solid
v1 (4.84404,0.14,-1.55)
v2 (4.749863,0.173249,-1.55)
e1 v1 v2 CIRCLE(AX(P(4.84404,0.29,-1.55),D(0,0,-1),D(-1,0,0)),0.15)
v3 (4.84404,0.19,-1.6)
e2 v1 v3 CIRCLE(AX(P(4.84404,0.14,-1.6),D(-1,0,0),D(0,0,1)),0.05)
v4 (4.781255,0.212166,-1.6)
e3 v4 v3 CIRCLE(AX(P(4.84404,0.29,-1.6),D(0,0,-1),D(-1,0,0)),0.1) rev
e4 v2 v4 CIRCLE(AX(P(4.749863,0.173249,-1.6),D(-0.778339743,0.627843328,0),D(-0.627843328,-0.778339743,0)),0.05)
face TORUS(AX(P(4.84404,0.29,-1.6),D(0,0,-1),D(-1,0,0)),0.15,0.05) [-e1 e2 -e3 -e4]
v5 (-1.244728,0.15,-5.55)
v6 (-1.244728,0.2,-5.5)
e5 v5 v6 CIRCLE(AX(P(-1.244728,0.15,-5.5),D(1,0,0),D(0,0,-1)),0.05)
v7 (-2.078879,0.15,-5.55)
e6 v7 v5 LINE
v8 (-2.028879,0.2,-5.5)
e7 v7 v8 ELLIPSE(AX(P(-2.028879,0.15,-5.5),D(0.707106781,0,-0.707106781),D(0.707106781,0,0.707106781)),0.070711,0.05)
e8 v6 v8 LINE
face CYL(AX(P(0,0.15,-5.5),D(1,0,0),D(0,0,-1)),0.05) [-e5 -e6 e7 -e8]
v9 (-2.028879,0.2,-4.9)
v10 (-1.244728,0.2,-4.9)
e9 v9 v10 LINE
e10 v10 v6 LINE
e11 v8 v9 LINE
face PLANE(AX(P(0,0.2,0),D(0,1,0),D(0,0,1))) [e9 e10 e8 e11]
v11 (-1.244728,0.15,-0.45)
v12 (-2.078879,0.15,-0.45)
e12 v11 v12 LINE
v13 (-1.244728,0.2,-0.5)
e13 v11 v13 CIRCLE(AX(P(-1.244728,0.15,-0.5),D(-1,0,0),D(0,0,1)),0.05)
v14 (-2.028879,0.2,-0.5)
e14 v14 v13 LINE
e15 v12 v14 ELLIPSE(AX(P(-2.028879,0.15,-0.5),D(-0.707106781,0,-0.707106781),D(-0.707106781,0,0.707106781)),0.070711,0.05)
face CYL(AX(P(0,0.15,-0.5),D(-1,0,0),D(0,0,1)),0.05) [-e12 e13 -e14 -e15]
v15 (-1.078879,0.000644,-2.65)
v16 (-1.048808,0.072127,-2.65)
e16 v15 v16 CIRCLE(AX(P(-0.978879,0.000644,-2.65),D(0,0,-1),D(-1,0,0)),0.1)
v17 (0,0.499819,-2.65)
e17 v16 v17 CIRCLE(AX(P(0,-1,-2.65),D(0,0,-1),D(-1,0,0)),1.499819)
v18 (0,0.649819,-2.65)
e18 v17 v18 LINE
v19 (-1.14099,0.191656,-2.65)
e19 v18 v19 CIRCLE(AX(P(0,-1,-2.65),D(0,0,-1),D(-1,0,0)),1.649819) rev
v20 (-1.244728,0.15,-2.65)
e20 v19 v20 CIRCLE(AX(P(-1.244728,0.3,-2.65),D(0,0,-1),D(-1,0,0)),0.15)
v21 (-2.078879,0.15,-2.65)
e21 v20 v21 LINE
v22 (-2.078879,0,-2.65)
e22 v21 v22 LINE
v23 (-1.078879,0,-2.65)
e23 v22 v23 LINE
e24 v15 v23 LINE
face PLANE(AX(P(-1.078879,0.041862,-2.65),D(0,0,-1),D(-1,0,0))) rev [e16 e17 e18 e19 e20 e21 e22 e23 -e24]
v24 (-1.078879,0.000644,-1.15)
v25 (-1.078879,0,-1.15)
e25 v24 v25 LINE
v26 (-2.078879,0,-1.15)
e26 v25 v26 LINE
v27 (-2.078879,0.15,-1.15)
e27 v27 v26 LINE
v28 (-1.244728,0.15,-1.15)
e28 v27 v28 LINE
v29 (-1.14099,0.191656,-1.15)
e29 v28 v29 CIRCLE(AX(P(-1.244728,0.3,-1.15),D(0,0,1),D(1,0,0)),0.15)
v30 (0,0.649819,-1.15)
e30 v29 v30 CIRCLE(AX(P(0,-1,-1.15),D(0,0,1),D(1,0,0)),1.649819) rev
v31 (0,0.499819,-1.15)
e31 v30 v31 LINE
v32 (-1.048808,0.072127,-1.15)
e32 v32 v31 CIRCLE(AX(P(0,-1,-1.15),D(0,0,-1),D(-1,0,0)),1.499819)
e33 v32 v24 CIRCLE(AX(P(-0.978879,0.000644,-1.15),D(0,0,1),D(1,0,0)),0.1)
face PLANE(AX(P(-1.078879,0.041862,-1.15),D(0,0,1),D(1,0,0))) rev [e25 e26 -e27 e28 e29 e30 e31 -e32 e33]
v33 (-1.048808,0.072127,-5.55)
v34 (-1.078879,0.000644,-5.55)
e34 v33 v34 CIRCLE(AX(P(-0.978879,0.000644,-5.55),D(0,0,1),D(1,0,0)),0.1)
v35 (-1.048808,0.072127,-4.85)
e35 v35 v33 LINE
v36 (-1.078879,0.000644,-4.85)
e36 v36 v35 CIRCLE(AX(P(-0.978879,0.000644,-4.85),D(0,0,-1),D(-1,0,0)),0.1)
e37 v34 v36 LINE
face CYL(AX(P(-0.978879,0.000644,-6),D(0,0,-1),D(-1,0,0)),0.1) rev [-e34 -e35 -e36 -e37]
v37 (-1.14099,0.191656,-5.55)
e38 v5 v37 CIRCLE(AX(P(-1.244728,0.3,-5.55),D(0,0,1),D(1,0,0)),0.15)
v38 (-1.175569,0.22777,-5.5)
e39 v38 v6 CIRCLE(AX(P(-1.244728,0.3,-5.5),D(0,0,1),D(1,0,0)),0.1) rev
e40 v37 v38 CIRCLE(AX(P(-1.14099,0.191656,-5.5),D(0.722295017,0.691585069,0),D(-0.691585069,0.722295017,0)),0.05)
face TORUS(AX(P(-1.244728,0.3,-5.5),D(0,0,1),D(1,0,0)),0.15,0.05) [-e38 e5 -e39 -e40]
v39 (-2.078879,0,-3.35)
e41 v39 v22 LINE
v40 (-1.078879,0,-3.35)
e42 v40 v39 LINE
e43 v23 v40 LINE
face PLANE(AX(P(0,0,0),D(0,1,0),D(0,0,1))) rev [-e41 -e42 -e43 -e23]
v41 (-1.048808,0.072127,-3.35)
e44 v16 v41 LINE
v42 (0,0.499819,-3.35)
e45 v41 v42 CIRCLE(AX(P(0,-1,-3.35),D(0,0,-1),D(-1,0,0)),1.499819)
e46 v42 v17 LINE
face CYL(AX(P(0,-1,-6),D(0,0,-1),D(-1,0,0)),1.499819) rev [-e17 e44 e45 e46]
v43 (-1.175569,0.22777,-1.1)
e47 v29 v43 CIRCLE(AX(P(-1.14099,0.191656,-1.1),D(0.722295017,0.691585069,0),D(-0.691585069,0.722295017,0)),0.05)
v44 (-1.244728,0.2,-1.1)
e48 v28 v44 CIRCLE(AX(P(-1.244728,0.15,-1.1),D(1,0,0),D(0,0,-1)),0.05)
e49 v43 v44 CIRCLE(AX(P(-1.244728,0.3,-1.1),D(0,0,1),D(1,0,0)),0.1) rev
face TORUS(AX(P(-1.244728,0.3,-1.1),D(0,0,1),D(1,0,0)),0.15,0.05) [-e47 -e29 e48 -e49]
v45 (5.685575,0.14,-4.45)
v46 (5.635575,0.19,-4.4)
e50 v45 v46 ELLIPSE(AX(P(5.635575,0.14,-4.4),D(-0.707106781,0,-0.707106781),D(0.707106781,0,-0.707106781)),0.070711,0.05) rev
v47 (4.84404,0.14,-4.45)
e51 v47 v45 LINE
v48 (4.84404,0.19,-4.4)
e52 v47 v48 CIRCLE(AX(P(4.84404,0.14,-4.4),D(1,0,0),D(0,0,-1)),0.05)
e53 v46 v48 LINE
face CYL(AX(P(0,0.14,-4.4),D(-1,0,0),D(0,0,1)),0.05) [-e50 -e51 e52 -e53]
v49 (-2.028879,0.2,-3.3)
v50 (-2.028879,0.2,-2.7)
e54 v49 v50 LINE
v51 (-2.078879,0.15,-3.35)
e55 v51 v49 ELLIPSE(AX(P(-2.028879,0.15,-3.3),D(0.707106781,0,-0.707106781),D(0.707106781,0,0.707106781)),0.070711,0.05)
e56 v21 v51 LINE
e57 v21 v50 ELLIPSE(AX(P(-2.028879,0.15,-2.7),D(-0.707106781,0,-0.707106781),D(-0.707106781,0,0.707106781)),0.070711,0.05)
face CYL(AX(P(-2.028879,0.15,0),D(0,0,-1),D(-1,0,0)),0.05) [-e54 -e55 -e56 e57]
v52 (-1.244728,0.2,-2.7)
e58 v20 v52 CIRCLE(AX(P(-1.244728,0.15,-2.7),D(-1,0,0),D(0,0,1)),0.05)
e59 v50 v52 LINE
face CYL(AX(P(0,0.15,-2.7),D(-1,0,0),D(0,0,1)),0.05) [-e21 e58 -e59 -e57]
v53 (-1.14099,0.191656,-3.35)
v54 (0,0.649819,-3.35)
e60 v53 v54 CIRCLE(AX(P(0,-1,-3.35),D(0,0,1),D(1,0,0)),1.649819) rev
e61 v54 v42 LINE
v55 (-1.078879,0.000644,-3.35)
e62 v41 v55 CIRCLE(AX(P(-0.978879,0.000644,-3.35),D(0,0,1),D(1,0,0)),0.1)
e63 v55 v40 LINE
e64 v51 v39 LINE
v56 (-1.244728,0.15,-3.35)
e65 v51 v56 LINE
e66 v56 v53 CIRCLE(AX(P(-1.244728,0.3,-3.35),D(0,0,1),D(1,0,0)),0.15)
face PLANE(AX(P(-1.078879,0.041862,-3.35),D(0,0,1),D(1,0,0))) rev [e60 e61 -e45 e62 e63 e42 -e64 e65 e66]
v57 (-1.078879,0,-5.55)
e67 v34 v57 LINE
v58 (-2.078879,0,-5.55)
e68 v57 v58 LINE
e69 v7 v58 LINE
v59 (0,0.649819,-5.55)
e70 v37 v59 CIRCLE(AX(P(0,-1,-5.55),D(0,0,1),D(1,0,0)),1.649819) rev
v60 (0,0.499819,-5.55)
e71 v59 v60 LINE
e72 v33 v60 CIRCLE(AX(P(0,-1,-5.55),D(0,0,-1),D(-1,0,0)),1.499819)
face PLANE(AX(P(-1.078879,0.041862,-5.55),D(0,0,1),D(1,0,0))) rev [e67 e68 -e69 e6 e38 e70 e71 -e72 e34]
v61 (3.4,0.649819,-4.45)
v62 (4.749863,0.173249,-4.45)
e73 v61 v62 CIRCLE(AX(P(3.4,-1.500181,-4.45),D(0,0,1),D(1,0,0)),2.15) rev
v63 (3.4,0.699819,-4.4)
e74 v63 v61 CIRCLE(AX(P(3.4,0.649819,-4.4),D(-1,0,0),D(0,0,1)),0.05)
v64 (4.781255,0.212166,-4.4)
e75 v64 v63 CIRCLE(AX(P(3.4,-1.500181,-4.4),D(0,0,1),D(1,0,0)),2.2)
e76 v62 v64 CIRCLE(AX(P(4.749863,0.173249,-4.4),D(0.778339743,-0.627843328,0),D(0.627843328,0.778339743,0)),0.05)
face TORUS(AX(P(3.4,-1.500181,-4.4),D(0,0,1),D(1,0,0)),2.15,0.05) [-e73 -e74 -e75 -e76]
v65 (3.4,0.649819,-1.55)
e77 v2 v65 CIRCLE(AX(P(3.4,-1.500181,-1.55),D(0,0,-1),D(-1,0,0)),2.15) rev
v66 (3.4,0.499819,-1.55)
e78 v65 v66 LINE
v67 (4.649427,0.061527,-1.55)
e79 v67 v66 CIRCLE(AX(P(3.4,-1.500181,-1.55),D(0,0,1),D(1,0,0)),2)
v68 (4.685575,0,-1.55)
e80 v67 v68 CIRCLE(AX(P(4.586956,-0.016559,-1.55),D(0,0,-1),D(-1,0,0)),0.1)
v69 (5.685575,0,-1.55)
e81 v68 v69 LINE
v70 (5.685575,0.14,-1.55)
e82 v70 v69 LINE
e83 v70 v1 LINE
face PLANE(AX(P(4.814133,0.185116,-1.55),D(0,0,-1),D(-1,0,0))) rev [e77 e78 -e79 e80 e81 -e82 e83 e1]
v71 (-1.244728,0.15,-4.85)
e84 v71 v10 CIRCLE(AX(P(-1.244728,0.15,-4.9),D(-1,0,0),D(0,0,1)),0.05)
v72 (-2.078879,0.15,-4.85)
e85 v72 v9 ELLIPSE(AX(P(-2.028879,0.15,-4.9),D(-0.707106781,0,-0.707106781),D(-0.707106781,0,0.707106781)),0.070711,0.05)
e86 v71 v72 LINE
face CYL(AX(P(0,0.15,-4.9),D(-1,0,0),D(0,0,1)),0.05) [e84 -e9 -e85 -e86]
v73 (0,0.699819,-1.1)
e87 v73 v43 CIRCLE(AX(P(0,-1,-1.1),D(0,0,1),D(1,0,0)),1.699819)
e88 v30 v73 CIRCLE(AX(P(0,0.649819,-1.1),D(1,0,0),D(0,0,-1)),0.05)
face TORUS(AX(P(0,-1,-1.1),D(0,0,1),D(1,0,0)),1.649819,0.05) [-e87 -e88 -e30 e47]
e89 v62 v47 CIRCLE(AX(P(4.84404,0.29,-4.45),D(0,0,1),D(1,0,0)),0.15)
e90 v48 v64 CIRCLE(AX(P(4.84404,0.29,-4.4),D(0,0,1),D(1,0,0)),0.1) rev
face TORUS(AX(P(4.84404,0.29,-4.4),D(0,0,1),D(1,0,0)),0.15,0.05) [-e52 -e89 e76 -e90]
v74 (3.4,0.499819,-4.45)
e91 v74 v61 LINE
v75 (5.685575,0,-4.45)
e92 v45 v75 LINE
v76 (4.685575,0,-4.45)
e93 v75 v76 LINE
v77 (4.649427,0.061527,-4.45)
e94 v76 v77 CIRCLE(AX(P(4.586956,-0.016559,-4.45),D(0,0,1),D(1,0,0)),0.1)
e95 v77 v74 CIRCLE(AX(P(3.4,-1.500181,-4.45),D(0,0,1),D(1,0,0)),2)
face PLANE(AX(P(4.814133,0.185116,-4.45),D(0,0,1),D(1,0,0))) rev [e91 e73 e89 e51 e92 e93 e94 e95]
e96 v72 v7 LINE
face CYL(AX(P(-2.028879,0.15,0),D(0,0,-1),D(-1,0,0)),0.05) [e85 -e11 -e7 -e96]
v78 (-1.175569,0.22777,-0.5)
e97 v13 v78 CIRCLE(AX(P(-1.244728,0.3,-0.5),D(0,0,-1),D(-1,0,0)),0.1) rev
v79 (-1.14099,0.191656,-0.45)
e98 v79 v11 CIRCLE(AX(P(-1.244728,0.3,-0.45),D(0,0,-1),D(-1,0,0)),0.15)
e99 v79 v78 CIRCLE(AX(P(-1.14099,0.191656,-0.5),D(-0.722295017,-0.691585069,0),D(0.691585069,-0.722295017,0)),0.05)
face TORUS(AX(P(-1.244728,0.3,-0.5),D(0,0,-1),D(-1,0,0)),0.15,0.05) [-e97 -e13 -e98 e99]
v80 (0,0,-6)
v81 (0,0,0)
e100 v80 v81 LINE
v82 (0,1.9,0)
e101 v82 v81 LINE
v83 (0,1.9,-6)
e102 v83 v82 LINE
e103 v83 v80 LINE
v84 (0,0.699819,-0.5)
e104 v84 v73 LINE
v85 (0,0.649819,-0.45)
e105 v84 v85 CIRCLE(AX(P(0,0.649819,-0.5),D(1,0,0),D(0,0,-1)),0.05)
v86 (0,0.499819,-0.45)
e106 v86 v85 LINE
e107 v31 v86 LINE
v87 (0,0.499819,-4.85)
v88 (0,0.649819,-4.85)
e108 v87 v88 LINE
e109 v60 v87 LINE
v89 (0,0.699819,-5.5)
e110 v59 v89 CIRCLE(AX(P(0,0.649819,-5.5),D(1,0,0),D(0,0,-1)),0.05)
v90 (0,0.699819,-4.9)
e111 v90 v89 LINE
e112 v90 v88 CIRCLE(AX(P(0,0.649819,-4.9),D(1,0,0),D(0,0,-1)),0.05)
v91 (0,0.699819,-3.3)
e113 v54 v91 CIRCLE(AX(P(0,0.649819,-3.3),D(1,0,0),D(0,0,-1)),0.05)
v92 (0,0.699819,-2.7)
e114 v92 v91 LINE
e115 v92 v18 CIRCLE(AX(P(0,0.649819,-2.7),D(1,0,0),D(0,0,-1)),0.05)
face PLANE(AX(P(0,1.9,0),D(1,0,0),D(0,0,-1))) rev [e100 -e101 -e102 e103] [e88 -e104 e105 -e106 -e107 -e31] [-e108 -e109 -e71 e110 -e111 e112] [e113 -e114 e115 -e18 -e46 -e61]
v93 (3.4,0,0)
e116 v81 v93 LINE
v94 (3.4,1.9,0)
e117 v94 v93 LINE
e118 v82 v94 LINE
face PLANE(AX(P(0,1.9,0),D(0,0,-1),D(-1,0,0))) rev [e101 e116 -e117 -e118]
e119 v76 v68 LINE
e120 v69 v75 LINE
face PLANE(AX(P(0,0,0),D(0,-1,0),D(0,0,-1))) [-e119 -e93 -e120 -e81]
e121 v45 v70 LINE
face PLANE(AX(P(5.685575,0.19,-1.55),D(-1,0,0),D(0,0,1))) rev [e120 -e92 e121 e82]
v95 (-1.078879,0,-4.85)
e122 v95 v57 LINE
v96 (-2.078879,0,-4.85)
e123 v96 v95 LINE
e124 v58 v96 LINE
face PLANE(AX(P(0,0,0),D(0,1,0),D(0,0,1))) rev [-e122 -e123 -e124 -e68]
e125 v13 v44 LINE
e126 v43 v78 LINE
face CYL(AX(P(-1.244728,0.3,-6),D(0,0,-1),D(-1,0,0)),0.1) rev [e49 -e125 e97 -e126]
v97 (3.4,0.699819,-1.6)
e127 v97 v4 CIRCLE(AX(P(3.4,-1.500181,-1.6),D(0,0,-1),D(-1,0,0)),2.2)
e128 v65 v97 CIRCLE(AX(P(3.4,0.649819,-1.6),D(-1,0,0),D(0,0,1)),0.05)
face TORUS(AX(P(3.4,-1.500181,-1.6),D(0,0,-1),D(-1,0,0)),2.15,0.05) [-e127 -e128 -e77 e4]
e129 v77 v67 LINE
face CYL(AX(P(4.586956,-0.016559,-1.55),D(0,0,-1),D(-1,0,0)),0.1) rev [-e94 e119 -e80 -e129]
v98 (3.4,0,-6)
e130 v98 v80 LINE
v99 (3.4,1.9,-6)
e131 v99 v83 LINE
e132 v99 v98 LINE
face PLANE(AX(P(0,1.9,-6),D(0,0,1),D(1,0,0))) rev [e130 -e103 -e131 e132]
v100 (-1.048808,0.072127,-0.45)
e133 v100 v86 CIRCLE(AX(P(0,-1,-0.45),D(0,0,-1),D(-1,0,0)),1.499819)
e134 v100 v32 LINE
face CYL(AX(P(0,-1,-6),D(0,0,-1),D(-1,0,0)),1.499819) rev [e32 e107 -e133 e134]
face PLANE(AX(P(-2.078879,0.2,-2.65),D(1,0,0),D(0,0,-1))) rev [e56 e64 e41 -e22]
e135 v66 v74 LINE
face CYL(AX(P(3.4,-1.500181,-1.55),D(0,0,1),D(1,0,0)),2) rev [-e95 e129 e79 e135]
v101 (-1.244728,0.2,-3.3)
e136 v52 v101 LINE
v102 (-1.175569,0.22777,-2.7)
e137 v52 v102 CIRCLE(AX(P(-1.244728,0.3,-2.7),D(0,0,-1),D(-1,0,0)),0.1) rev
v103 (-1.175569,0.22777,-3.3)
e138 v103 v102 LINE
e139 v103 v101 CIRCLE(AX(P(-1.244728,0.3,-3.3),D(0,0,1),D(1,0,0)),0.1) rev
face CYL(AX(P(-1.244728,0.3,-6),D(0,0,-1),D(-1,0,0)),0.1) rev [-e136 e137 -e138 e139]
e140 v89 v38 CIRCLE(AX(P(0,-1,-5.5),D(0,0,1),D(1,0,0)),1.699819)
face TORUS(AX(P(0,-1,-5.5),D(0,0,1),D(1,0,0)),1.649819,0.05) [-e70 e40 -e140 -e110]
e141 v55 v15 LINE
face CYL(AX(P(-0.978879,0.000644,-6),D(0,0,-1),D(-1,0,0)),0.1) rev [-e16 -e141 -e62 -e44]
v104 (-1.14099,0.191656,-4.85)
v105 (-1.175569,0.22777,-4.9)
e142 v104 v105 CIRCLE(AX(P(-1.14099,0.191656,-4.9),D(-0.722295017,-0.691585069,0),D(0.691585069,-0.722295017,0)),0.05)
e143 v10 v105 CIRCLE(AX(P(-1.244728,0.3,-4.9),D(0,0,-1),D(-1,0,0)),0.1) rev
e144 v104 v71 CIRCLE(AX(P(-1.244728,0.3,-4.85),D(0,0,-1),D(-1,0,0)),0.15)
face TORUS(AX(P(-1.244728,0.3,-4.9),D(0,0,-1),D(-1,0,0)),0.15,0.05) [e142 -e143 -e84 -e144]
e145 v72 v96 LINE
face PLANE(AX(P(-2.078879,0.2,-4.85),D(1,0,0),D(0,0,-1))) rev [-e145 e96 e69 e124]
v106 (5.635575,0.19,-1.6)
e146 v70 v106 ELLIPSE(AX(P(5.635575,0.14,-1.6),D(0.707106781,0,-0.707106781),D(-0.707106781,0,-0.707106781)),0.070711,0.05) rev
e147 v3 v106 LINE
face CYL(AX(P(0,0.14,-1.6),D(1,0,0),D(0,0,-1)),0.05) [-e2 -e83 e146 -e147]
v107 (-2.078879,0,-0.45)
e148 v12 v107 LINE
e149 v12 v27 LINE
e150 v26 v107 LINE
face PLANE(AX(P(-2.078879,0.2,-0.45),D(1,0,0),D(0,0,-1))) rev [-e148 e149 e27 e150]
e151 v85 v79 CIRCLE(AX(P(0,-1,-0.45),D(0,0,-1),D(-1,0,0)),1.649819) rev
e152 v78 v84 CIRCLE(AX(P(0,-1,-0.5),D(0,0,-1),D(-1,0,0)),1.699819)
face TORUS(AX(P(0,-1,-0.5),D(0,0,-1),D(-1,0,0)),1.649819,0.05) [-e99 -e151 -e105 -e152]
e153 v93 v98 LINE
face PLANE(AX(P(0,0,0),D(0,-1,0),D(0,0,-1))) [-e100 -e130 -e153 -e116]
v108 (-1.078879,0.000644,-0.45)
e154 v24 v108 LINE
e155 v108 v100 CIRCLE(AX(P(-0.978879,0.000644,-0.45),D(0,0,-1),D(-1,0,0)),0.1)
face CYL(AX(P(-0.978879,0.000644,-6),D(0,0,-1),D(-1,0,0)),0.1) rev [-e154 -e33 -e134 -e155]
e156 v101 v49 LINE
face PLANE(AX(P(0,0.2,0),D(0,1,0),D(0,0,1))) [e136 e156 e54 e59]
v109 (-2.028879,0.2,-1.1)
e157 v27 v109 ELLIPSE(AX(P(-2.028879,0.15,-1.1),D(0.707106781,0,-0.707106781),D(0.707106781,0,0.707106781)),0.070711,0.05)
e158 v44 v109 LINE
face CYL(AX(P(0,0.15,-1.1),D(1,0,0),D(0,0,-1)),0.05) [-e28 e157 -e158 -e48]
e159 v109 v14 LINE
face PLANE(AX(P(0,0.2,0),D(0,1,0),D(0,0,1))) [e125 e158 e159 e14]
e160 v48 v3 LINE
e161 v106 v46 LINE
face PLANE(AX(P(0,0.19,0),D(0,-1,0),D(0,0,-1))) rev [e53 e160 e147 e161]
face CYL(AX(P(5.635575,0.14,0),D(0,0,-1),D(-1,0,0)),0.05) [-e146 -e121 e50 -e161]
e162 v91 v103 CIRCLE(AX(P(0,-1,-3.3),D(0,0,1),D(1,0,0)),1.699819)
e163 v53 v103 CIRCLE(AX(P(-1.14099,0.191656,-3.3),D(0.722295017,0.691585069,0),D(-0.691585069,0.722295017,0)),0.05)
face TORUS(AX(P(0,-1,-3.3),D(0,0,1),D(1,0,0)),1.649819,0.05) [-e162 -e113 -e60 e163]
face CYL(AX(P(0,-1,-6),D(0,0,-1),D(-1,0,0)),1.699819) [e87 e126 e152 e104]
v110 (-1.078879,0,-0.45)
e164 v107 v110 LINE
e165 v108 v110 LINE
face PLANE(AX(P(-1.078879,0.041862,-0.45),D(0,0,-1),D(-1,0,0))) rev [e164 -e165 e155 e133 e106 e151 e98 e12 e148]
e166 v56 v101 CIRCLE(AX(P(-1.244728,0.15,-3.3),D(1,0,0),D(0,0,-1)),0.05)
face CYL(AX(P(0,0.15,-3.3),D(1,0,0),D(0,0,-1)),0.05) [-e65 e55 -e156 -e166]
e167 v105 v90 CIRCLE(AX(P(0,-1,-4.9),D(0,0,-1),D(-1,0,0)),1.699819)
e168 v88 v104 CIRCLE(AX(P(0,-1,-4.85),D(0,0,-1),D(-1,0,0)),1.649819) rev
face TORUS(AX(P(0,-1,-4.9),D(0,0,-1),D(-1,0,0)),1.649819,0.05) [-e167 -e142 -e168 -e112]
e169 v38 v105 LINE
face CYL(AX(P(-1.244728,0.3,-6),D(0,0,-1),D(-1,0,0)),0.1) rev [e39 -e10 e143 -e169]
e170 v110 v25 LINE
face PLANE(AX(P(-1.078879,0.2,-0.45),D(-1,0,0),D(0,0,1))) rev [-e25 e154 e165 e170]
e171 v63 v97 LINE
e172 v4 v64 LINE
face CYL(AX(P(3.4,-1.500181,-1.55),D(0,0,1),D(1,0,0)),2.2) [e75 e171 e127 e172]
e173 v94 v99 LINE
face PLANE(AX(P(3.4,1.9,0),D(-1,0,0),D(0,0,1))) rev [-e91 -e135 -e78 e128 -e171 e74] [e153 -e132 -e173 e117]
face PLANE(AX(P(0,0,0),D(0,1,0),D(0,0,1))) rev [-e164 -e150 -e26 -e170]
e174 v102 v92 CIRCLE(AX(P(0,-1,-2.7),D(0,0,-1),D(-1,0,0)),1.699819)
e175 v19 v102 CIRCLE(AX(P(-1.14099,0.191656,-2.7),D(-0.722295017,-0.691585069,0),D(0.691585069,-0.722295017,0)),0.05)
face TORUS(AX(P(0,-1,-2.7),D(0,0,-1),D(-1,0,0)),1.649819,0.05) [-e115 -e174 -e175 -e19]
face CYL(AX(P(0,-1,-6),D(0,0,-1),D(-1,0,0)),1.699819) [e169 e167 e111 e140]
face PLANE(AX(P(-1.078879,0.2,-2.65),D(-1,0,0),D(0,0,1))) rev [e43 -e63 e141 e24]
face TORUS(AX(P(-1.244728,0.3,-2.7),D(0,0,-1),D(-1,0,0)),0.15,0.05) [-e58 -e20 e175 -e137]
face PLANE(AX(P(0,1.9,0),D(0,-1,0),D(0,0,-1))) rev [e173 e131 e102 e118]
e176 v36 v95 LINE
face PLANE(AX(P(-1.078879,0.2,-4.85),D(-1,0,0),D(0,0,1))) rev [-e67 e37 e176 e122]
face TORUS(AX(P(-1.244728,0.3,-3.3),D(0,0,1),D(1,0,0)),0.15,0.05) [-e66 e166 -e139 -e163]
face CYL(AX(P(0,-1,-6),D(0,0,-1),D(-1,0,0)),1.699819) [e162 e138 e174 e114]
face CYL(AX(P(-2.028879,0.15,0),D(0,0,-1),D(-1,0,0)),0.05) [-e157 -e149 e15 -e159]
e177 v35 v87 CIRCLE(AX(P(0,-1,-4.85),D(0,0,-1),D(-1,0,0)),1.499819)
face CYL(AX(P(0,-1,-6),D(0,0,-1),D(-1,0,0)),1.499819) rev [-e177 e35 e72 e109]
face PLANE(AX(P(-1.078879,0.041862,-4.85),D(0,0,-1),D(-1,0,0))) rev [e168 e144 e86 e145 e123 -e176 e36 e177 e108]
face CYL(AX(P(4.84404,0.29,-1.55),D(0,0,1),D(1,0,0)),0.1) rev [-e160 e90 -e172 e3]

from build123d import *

# Parameters (mm, degrees)
ESQUISSE1_W        = 3.4
ESQUISSE1_H        = 6
BOSS_EXTRU_1_DEPTH = 1.9
ESQUISSE2_W        = 2.9
ESQUISSE2_H        = 0.2
R_VOLUTION1_ANGLE  = 40
ESQUISSE4_W        = 1
ESQUISSE4_H        = 2.9
BOSS_EXTRU_2_DEPTH = 0.19
CONG_1_R           = 0.1
CONG_2_R           = 0.05
ESQUISSE6_W        = 0.7
ESQUISSE6_H        = 0.2
R_VOLUTION2_ANGLE  = 46
ESQUISSE8_W        = 1
ESQUISSE8_H        = 0.7
BOSS_EXTRU_3_DEPTH = 0.2
CONG_3_R           = 0.1
CONG_4_R           = 0.05


with BuildPart() as part:
    # Esquisse1 → Boss.-Extru.1 (new body)
    with BuildSketch(Plane(origin=(0, 0, 0), x_dir=(1, 0, 0), z_dir=(0, 1, 0))):
        with Locations((1.7, 3)):
            Rectangle(ESQUISSE1_W, ESQUISSE1_H)
    extrude(amount=BOSS_EXTRU_1_DEPTH)

    # Esquisse2 → Révolution1 (revolve)
    with BuildSketch(Plane(origin=(3.4, 0, 0), x_dir=(0, 0, -1), z_dir=(1, 0, 0))):
        with Locations((3, 0.599818591)):
            Rectangle(ESQUISSE2_W, ESQUISSE2_H)
    revolve(axis=Axis((3.4, -1.500181409, -1.55), (0, 0, -1)), revolution_arc=R_VOLUTION1_ANGLE)

    # Esquisse4 → Boss.-Extru.2 (add)
    with BuildSketch(Plane(origin=(0, 0, 0), x_dir=(1, 0, 0), z_dir=(0, 1, 0))):
        with Locations((5.185575219, 3)):
            Rectangle(ESQUISSE4_W, ESQUISSE4_H)
    extrude(amount=BOSS_EXTRU_2_DEPTH)

    # Congé1
    # the kernel refuses this fillet: 0.1 mm, written as the material it adds along each edge
    with BuildSketch(Plane(origin=(4.685575219, 0.031907477, -4.45), x_dir=(-0.7735020248903554, 0.6337938288517173, 0), z_dir=(0, 0, 1))) as cong_1_piece_1:
        with BuildLine():
            CenterArc((0.04556478, 0.099993175), CONG_1_R, 228.861958966, 41.807458726)
            Line((-0.020222762, 0.024680498), (-0.021538513, 0.023174245))
            ThreePointArc((-0.021538513, 0.023174245), (-0.011658385, 0.011072661), (-0.001547004, -0.001267588))
            Line((-0.001547004, -0.001267588), (-2.3367e-05, -0.001999863))
            ThreePointArc((-2.3367e-05, -0.001999863), (0.023366554, -0.002136504), (0.046756475, -0.001999863))
            Line((0.046756475, -0.001999863), (0.046733108, 0))
        make_face()
    extrude(amount=2.9)
    with BuildSketch(Plane(origin=(4.808292159, 0.19, -1.55), x_dir=(-0.7733264230058849, 0.6340080784035191, 0), z_dir=(0, 0, -1))) as cong_1_piece_2:
        with BuildLine():
            CenterArc((0.035756325, 0.099996843), CONG_1_R, 230.653545738, 38.8911858)
            Line((-0.027644483, 0.022664201), (-0.028912499, 0.021117548))
            Line((-0.028912499, 0.021117548), (-0.001268016, -0.001546653))
            Line((-0.001268016, -0.001546653), (1.5892e-05, -0.001999937))
            ThreePointArc((1.5892e-05, -0.001999937), (0.01748087, -0.001930549), (0.034945848, -0.001999937))
            Line((0.034945848, -0.001999937), (0.03496174, 0))
        make_face()
    extrude(amount=2.9)

    # Congé2
    cong_2_edges = [part.edges().sort_by_distance(p)[0] for p in [
        (5.264807437, 0.19, -4.45),
        (5.685575219, 0.19, -3),
        (5.264807437, 0.19, -1.55),
        (4.132405504, 0.574326286, -4.45),
        (4.132405504, 0.574326286, -1.55),
        (4.810748495, 0.195704196, -1.55),
        (4.810748495, 0.195704196, -4.45),
    ]]
    fillet(cong_2_edges, radius=CONG_2_R)

    # Esquisse6 → Révolution2 (revolve)
    with BuildSketch(Plane.ZY):
        with Locations((-3, 0.599818591)):
            Rectangle(ESQUISSE6_W, ESQUISSE6_H)
        with Locations((-5.2, 0.599818591)):
            Rectangle(ESQUISSE6_W, ESQUISSE6_H)
        with Locations((-0.8, 0.599818591)):
            Rectangle(ESQUISSE6_W, ESQUISSE6_H)
    revolve(axis=Axis((0, -1, -6), (0, 0, 1)), revolution_arc=R_VOLUTION2_ANGLE)

    # Esquisse8 → Boss.-Extru.3 (add)
    with BuildSketch(Plane(origin=(0, 0, 0), x_dir=(1, 0, 0), z_dir=(0, 1, 0))):
        with Locations((-1.578879206, 0.8)):
            Rectangle(ESQUISSE8_W, ESQUISSE8_H)
        with Locations((-1.578879206, 3)):
            Rectangle(ESQUISSE8_W, ESQUISSE8_H)
        with Locations((-1.578879206, 5.2)):
            Rectangle(ESQUISSE8_W, ESQUISSE8_H)
    extrude(amount=BOSS_EXTRU_3_DEPTH)

    # Congé3
    cong_3_edges = [part.edges().sort_by_distance(p)[0] for p in [
        (-1.078879206, 0.041861538, -0.8),
        (-1.203903336, 0.2, -0.8),
        (-1.203903336, 0.2, -3),
        (-1.203903336, 0.2, -5.2),
        (-1.078879206, 0.041861538, -3),
        (-1.078879206, 0.041861538, -5.2),
    ]]
    fillet(cong_3_edges, radius=CONG_3_R)

    # Congé4
    cong_4_edges = [part.edges().sort_by_distance(p)[0] for p in [
        (-2.078879206, 0.2, -0.8),
        (-1.661803435, 0.2, -0.45),
        (-2.078879206, 0.2, -3),
        (-1.661803435, 0.2, -2.65),
        (-2.078879206, 0.2, -5.2),
        (-1.661803435, 0.2, -4.85),
        (-0.633401975, 0.577398231, -1.15),
        (-0.633401975, 0.577398231, -0.45),
        (-1.661803435, 0.2, -1.15),
        (-0.633401975, 0.577398231, -5.55),
        (-0.633401975, 0.577398231, -4.85),
        (-1.661803435, 0.2, -5.55),
        (-0.633401975, 0.577398231, -3.35),
        (-0.633401975, 0.577398231, -2.65),
        (-1.661803435, 0.2, -3.35),
        (-1.207464749, 0.207201966, -0.45),
        (-1.207464749, 0.207201966, -1.15),
        (-1.207464749, 0.207201966, -4.85),
        (-1.207464749, 0.207201966, -5.55),
        (-1.207464749, 0.207201966, -2.65),
        (-1.207464749, 0.207201966, -3.35),
    ]]
    fillet(cong_4_edges, radius=CONG_4_R)


solid = part.part
